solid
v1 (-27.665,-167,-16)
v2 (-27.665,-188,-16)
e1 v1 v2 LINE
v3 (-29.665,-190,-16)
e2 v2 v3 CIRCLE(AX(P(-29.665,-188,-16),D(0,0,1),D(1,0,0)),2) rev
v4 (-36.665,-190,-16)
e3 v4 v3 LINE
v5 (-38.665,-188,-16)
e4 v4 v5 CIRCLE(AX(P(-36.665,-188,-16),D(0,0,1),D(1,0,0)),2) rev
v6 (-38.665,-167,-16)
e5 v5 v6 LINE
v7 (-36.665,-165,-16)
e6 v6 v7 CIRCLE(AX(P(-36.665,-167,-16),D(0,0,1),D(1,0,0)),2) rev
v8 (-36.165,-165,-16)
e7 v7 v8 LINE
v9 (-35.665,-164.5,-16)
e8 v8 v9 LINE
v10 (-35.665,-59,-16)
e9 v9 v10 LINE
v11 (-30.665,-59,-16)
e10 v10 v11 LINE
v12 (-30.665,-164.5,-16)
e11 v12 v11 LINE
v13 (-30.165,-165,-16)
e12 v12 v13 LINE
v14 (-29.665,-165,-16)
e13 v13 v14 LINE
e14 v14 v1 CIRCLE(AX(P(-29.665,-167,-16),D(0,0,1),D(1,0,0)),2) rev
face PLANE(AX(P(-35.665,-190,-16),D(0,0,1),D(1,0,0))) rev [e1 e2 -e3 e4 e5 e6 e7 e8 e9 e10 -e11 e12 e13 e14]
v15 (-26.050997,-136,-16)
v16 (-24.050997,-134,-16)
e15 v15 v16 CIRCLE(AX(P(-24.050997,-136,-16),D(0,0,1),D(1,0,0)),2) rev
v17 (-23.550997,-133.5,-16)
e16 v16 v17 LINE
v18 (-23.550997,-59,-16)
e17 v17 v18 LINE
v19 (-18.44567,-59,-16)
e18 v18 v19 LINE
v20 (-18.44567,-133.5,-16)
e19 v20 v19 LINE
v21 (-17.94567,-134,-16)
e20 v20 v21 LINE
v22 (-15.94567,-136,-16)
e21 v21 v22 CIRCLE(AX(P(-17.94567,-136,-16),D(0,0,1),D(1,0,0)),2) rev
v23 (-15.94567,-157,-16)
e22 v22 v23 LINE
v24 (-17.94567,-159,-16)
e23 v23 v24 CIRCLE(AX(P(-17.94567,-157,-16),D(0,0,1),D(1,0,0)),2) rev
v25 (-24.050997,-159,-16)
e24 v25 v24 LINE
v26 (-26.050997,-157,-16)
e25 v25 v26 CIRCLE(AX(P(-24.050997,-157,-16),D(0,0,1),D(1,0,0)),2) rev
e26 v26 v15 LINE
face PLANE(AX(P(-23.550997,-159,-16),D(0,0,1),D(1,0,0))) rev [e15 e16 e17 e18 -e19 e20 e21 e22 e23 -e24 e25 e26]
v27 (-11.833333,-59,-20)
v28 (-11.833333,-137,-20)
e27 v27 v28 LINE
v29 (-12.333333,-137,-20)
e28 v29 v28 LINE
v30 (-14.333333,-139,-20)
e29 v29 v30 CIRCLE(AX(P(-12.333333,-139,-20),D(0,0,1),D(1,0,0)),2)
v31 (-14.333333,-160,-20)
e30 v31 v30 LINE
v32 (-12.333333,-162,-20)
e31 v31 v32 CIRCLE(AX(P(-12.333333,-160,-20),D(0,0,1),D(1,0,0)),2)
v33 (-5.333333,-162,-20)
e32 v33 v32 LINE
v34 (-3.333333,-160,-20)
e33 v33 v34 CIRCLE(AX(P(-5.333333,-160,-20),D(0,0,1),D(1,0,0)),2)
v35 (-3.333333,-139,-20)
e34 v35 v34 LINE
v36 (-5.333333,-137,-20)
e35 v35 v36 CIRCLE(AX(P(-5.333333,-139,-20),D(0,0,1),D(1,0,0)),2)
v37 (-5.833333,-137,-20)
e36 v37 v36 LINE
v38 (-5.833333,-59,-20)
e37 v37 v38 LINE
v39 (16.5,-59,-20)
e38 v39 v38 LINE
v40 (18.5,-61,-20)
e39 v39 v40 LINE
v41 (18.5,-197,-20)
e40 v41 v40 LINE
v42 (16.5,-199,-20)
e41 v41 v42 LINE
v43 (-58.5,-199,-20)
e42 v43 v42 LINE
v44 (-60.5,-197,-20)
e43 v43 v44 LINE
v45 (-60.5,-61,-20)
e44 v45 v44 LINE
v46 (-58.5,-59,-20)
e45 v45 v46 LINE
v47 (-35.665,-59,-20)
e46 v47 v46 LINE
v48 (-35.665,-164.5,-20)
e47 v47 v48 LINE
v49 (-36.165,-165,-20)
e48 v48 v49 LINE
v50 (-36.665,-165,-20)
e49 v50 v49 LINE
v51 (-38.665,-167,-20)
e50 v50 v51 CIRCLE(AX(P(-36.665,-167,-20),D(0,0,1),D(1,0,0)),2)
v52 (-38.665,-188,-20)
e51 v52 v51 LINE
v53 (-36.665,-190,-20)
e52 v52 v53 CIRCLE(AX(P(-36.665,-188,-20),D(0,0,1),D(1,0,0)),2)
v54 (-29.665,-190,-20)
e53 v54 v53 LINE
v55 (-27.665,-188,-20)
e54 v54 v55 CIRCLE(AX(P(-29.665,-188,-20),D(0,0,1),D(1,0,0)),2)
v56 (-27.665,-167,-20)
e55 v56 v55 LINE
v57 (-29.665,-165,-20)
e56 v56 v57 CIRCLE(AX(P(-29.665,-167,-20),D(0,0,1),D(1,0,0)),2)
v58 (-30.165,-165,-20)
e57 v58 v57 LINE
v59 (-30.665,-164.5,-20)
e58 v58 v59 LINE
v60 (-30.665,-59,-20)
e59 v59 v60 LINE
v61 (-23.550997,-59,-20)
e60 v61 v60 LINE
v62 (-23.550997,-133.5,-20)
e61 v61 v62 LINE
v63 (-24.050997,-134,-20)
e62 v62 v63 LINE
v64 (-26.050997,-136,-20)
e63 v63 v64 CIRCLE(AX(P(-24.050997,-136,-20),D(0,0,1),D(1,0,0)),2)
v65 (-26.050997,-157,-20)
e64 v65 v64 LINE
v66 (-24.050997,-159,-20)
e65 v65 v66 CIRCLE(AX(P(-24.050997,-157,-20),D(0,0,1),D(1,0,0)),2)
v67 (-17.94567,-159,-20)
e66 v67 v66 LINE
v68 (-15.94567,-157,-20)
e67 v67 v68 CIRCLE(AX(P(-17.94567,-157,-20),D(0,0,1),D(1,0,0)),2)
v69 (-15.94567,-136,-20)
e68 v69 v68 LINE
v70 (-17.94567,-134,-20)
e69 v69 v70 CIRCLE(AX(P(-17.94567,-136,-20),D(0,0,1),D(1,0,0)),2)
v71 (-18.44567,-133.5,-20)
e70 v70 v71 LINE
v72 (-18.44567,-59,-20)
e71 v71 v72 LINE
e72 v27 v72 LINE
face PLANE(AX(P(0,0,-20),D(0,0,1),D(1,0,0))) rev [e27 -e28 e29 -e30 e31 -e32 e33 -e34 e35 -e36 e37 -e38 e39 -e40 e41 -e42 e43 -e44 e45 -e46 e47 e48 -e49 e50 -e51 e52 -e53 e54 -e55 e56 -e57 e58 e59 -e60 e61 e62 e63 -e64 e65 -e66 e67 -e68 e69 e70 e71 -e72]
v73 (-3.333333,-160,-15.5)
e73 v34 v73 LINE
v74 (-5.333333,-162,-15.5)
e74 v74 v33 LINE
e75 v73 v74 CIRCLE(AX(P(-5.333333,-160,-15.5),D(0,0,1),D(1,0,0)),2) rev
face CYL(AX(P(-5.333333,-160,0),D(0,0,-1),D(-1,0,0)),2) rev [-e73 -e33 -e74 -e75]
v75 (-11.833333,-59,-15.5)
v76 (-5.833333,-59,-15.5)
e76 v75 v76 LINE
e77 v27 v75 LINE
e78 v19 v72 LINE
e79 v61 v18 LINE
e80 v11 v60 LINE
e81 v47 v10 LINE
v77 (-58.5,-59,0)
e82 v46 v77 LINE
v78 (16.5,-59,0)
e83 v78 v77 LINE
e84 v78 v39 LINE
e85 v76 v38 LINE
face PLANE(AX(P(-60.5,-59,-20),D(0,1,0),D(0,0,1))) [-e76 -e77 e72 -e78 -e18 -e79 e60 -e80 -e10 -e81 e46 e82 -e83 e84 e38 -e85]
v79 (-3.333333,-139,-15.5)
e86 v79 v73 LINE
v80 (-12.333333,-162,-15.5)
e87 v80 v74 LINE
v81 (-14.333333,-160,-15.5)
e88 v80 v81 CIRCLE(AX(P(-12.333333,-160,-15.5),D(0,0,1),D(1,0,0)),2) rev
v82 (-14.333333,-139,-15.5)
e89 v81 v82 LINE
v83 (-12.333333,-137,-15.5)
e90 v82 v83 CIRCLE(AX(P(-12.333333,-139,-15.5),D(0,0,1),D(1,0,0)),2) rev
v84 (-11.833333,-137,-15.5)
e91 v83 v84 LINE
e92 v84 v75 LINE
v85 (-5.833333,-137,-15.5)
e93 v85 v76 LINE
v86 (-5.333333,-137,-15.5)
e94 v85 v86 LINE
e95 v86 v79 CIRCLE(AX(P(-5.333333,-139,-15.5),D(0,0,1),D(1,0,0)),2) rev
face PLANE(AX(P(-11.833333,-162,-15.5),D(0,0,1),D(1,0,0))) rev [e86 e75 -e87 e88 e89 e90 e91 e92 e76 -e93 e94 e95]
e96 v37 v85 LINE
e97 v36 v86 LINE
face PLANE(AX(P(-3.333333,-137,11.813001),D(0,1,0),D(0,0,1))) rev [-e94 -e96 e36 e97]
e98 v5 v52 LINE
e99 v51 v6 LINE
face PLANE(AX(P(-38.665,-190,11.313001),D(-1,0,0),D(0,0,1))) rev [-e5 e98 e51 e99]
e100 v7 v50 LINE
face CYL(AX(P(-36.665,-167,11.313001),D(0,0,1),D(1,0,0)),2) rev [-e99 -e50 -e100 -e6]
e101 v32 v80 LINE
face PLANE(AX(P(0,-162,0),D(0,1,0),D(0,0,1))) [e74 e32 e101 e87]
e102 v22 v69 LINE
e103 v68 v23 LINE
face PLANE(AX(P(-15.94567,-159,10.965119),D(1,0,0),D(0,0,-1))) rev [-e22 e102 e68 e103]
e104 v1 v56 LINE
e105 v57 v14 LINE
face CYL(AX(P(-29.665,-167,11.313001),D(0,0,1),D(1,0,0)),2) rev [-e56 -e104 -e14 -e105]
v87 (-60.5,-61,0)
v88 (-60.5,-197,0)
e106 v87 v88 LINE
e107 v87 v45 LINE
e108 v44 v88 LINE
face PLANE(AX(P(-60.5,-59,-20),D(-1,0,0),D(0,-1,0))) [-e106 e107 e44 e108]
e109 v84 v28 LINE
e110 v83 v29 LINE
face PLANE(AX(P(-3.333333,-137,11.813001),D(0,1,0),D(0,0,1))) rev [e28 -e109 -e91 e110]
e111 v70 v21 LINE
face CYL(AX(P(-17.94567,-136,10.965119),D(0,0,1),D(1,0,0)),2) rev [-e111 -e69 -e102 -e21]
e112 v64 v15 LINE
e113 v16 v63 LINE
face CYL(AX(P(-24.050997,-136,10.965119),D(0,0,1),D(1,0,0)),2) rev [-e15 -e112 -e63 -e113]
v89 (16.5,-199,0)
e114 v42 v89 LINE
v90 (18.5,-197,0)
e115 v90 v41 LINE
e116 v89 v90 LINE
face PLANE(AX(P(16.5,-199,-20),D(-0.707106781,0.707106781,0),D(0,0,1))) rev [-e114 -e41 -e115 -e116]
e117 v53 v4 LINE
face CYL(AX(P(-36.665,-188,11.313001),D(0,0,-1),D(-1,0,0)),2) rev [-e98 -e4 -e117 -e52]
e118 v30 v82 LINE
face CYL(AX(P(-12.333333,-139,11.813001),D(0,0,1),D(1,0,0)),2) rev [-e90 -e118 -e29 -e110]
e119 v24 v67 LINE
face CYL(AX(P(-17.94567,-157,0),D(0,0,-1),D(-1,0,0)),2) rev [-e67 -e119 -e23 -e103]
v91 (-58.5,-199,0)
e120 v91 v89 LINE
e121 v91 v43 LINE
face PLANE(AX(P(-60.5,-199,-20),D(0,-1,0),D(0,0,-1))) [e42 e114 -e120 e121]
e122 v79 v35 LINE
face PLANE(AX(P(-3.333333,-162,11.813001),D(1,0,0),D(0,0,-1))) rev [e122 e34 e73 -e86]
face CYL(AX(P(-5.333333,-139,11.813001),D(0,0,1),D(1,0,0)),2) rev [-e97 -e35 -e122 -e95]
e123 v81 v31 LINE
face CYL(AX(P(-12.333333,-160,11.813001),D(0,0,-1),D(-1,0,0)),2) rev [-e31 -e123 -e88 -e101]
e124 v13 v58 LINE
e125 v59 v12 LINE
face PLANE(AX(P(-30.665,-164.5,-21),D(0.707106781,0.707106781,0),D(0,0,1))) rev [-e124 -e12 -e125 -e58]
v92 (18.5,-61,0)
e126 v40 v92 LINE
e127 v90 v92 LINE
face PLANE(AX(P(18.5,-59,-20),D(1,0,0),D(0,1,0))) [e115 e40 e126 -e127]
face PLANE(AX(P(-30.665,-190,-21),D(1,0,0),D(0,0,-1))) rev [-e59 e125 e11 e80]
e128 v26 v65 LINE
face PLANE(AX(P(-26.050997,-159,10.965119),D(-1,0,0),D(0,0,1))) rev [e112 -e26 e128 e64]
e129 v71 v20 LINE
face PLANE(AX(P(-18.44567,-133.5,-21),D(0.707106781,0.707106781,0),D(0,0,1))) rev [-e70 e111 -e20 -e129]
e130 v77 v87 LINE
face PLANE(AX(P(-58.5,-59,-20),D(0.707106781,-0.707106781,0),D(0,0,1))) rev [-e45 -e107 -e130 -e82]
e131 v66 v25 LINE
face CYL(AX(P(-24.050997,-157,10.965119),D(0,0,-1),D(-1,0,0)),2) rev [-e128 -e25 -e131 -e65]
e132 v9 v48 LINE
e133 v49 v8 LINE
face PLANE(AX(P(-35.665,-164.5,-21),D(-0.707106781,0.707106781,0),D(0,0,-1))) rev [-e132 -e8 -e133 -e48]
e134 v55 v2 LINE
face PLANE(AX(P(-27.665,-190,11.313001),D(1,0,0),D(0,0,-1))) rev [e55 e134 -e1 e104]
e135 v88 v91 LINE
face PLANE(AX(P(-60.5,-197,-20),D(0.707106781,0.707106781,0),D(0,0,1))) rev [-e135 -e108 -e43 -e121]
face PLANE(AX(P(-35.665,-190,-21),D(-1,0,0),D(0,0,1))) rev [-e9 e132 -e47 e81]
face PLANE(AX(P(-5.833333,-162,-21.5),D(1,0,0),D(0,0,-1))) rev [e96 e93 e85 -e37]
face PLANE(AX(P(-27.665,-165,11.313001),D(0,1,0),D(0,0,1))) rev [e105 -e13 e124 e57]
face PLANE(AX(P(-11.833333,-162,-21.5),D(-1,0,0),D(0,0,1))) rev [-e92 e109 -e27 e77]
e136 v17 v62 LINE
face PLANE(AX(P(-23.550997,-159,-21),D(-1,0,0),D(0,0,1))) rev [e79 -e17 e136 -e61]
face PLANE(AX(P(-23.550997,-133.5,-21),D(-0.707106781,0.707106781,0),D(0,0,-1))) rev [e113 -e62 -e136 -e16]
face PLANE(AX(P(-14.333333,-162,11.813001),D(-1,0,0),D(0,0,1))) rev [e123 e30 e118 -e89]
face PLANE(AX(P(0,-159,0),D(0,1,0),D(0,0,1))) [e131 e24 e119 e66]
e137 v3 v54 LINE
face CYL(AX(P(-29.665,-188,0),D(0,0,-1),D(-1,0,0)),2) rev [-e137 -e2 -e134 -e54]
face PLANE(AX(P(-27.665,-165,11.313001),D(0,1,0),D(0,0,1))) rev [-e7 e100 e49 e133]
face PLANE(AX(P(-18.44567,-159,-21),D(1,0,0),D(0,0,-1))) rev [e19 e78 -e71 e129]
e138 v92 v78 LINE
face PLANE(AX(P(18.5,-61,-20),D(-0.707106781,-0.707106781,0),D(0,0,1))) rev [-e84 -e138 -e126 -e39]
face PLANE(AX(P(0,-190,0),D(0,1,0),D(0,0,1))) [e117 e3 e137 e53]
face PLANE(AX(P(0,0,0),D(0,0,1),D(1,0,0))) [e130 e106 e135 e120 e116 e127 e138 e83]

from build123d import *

# Parameters (mm, degrees)
SKETCH1_W           = 79
SKETCH1_H           = 140
BOSS_EXTRUDE1_DEPTH = 20
SKETCH3_W           = 5
SKETCH3_H           = 5
CUT_EXTRUDE1_DEPTH  = 131
SKETCH4_W           = 11
SKETCH4_H           = 25
CUT_EXTRUDE2_DEPTH  = 4
FILLET1_R           = 2
CHAMFER1_SIZE       = 0.5
SKETCH6_W           = 5.105326573
SKETCH6_H           = 5
CUT_EXTRUDE3_DEPTH  = 100
SKETCH7_W           = 10.105326573
SKETCH7_H           = 25
CUT_EXTRUDE4_DEPTH  = 4
FILLET2_R           = 2
CHAMFER2_SIZE       = 0.5
SKETCH8_W           = 6
SKETCH8_H           = 6
CUT_EXTRUDE5_DEPTH  = 103
SKETCH9_W           = 11
SKETCH9_H           = 25
CUT_EXTRUDE6_DEPTH  = 4.5
FILLET3_R           = 2
CHAMFER3_SIZE       = 2


with BuildPart() as part:
    # Sketch1 → Boss-Extrude1 (new body)
    with BuildSketch(Plane.XY):
        with Locations((-21, -129)):
            Rectangle(SKETCH1_W, SKETCH1_H)
    extrude(amount=-BOSS_EXTRUDE1_DEPTH)

    # Sketch3 → Cut-Extrude1 (cut)
    with BuildSketch(Plane(origin=(0, -59, 0), x_dir=(1, 0, 0), z_dir=(0, 1, 0))):
        with Locations((-33.165, 18.5)):
            Rectangle(SKETCH3_W, SKETCH3_H)
    extrude(amount=-CUT_EXTRUDE1_DEPTH, mode=Mode.SUBTRACT)

    # Sketch4 → Cut-Extrude2 (cut)
    with BuildSketch(Plane(origin=(0, 0, -20), x_dir=(-1, 0, 0), z_dir=(0, 0, -1))):
        with Locations((33.165, -177.5)):
            Rectangle(SKETCH4_W, SKETCH4_H)
    extrude(amount=-CUT_EXTRUDE2_DEPTH, mode=Mode.SUBTRACT)

    # Fillet1
    fillet1_edges = [part.edges().sort_by_distance(p)[0] for p in [
        (-38.665, -190, -18),
        (-27.665, -165, -18),
        (-38.665, -165, -18),
        (-27.665, -190, -18),
    ]]
    fillet(fillet1_edges, radius=FILLET1_R)

    # Chamfer1
    chamfer1_edges = [part.edges().sort_by_distance(p)[0] for p in [
        (-30.665, -165, -18),
        (-35.665, -165, -18),
    ]]
    chamfer(chamfer1_edges, length=CHAMFER1_SIZE)

    # Sketch6 → Cut-Extrude3 (cut)
    with BuildSketch(Plane(origin=(0, -59, 0), x_dir=(1, 0, 0), z_dir=(0, 1, 0))):
        with Locations((-20.998333333, 18.5)):
            Rectangle(SKETCH6_W, SKETCH6_H)
    extrude(amount=-CUT_EXTRUDE3_DEPTH, mode=Mode.SUBTRACT)

    # Sketch7 → Cut-Extrude4 (cut)
    with BuildSketch(Plane(origin=(0, 0, -20), x_dir=(-1, 0, 0), z_dir=(0, 0, -1))):
        with Locations((20.998333333, -146.5)):
            Rectangle(SKETCH7_W, SKETCH7_H)
    extrude(amount=-CUT_EXTRUDE4_DEPTH, mode=Mode.SUBTRACT)

    # Fillet2
    fillet2_edges = [part.edges().sort_by_distance(p)[0] for p in [
        (-26.05099662, -159, -18),
        (-15.945670047, -134, -18),
        (-26.05099662, -134, -18),
        (-15.945670047, -159, -18),
    ]]
    fillet(fillet2_edges, radius=FILLET2_R)

    # Chamfer2
    chamfer2_edges = [part.edges().sort_by_distance(p)[0] for p in [
        (-23.55099662, -134, -18),
        (-18.445670047, -134, -18),
    ]]
    chamfer(chamfer2_edges, length=CHAMFER2_SIZE - 0.0001)  # a hair under: the kernel refuses the full size

    # Sketch8 → Cut-Extrude5 (cut)
    with BuildSketch(Plane(origin=(0, -59, 0), x_dir=(1, 0, 0), z_dir=(0, 1, 0))):
        with Locations((-8.833333333, 18.5)):
            Rectangle(SKETCH8_W, SKETCH8_H)
    extrude(amount=-CUT_EXTRUDE5_DEPTH, mode=Mode.SUBTRACT)

    # Sketch9 → Cut-Extrude6 (cut)
    with BuildSketch(Plane(origin=(0, 0, -20), x_dir=(-1, 0, 0), z_dir=(0, 0, -1))):
        with Locations((8.833333333, -149.5)):
            Rectangle(SKETCH9_W, SKETCH9_H)
    extrude(amount=-CUT_EXTRUDE6_DEPTH, mode=Mode.SUBTRACT)

    # Fillet3
    fillet3_edges = [part.edges().sort_by_distance(p)[0] for p in [
        (-14.333333333, -162, -17.75),
        (-3.333333333, -137, -17.75),
        (-14.333333333, -137, -17.75),
        (-3.333333333, -162, -17.75),
    ]]
    fillet(fillet3_edges, radius=FILLET3_R)

    # Chamfer3
    chamfer3_edges = [part.edges().sort_by_distance(p)[0] for p in [
        (-60.5, -59, -10),
        (18.5, -59, -10),
        (18.5, -199, -10),
        (-60.5, -199, -10),
    ]]
    chamfer(chamfer3_edges, length=CHAMFER3_SIZE)


solid = part.part
